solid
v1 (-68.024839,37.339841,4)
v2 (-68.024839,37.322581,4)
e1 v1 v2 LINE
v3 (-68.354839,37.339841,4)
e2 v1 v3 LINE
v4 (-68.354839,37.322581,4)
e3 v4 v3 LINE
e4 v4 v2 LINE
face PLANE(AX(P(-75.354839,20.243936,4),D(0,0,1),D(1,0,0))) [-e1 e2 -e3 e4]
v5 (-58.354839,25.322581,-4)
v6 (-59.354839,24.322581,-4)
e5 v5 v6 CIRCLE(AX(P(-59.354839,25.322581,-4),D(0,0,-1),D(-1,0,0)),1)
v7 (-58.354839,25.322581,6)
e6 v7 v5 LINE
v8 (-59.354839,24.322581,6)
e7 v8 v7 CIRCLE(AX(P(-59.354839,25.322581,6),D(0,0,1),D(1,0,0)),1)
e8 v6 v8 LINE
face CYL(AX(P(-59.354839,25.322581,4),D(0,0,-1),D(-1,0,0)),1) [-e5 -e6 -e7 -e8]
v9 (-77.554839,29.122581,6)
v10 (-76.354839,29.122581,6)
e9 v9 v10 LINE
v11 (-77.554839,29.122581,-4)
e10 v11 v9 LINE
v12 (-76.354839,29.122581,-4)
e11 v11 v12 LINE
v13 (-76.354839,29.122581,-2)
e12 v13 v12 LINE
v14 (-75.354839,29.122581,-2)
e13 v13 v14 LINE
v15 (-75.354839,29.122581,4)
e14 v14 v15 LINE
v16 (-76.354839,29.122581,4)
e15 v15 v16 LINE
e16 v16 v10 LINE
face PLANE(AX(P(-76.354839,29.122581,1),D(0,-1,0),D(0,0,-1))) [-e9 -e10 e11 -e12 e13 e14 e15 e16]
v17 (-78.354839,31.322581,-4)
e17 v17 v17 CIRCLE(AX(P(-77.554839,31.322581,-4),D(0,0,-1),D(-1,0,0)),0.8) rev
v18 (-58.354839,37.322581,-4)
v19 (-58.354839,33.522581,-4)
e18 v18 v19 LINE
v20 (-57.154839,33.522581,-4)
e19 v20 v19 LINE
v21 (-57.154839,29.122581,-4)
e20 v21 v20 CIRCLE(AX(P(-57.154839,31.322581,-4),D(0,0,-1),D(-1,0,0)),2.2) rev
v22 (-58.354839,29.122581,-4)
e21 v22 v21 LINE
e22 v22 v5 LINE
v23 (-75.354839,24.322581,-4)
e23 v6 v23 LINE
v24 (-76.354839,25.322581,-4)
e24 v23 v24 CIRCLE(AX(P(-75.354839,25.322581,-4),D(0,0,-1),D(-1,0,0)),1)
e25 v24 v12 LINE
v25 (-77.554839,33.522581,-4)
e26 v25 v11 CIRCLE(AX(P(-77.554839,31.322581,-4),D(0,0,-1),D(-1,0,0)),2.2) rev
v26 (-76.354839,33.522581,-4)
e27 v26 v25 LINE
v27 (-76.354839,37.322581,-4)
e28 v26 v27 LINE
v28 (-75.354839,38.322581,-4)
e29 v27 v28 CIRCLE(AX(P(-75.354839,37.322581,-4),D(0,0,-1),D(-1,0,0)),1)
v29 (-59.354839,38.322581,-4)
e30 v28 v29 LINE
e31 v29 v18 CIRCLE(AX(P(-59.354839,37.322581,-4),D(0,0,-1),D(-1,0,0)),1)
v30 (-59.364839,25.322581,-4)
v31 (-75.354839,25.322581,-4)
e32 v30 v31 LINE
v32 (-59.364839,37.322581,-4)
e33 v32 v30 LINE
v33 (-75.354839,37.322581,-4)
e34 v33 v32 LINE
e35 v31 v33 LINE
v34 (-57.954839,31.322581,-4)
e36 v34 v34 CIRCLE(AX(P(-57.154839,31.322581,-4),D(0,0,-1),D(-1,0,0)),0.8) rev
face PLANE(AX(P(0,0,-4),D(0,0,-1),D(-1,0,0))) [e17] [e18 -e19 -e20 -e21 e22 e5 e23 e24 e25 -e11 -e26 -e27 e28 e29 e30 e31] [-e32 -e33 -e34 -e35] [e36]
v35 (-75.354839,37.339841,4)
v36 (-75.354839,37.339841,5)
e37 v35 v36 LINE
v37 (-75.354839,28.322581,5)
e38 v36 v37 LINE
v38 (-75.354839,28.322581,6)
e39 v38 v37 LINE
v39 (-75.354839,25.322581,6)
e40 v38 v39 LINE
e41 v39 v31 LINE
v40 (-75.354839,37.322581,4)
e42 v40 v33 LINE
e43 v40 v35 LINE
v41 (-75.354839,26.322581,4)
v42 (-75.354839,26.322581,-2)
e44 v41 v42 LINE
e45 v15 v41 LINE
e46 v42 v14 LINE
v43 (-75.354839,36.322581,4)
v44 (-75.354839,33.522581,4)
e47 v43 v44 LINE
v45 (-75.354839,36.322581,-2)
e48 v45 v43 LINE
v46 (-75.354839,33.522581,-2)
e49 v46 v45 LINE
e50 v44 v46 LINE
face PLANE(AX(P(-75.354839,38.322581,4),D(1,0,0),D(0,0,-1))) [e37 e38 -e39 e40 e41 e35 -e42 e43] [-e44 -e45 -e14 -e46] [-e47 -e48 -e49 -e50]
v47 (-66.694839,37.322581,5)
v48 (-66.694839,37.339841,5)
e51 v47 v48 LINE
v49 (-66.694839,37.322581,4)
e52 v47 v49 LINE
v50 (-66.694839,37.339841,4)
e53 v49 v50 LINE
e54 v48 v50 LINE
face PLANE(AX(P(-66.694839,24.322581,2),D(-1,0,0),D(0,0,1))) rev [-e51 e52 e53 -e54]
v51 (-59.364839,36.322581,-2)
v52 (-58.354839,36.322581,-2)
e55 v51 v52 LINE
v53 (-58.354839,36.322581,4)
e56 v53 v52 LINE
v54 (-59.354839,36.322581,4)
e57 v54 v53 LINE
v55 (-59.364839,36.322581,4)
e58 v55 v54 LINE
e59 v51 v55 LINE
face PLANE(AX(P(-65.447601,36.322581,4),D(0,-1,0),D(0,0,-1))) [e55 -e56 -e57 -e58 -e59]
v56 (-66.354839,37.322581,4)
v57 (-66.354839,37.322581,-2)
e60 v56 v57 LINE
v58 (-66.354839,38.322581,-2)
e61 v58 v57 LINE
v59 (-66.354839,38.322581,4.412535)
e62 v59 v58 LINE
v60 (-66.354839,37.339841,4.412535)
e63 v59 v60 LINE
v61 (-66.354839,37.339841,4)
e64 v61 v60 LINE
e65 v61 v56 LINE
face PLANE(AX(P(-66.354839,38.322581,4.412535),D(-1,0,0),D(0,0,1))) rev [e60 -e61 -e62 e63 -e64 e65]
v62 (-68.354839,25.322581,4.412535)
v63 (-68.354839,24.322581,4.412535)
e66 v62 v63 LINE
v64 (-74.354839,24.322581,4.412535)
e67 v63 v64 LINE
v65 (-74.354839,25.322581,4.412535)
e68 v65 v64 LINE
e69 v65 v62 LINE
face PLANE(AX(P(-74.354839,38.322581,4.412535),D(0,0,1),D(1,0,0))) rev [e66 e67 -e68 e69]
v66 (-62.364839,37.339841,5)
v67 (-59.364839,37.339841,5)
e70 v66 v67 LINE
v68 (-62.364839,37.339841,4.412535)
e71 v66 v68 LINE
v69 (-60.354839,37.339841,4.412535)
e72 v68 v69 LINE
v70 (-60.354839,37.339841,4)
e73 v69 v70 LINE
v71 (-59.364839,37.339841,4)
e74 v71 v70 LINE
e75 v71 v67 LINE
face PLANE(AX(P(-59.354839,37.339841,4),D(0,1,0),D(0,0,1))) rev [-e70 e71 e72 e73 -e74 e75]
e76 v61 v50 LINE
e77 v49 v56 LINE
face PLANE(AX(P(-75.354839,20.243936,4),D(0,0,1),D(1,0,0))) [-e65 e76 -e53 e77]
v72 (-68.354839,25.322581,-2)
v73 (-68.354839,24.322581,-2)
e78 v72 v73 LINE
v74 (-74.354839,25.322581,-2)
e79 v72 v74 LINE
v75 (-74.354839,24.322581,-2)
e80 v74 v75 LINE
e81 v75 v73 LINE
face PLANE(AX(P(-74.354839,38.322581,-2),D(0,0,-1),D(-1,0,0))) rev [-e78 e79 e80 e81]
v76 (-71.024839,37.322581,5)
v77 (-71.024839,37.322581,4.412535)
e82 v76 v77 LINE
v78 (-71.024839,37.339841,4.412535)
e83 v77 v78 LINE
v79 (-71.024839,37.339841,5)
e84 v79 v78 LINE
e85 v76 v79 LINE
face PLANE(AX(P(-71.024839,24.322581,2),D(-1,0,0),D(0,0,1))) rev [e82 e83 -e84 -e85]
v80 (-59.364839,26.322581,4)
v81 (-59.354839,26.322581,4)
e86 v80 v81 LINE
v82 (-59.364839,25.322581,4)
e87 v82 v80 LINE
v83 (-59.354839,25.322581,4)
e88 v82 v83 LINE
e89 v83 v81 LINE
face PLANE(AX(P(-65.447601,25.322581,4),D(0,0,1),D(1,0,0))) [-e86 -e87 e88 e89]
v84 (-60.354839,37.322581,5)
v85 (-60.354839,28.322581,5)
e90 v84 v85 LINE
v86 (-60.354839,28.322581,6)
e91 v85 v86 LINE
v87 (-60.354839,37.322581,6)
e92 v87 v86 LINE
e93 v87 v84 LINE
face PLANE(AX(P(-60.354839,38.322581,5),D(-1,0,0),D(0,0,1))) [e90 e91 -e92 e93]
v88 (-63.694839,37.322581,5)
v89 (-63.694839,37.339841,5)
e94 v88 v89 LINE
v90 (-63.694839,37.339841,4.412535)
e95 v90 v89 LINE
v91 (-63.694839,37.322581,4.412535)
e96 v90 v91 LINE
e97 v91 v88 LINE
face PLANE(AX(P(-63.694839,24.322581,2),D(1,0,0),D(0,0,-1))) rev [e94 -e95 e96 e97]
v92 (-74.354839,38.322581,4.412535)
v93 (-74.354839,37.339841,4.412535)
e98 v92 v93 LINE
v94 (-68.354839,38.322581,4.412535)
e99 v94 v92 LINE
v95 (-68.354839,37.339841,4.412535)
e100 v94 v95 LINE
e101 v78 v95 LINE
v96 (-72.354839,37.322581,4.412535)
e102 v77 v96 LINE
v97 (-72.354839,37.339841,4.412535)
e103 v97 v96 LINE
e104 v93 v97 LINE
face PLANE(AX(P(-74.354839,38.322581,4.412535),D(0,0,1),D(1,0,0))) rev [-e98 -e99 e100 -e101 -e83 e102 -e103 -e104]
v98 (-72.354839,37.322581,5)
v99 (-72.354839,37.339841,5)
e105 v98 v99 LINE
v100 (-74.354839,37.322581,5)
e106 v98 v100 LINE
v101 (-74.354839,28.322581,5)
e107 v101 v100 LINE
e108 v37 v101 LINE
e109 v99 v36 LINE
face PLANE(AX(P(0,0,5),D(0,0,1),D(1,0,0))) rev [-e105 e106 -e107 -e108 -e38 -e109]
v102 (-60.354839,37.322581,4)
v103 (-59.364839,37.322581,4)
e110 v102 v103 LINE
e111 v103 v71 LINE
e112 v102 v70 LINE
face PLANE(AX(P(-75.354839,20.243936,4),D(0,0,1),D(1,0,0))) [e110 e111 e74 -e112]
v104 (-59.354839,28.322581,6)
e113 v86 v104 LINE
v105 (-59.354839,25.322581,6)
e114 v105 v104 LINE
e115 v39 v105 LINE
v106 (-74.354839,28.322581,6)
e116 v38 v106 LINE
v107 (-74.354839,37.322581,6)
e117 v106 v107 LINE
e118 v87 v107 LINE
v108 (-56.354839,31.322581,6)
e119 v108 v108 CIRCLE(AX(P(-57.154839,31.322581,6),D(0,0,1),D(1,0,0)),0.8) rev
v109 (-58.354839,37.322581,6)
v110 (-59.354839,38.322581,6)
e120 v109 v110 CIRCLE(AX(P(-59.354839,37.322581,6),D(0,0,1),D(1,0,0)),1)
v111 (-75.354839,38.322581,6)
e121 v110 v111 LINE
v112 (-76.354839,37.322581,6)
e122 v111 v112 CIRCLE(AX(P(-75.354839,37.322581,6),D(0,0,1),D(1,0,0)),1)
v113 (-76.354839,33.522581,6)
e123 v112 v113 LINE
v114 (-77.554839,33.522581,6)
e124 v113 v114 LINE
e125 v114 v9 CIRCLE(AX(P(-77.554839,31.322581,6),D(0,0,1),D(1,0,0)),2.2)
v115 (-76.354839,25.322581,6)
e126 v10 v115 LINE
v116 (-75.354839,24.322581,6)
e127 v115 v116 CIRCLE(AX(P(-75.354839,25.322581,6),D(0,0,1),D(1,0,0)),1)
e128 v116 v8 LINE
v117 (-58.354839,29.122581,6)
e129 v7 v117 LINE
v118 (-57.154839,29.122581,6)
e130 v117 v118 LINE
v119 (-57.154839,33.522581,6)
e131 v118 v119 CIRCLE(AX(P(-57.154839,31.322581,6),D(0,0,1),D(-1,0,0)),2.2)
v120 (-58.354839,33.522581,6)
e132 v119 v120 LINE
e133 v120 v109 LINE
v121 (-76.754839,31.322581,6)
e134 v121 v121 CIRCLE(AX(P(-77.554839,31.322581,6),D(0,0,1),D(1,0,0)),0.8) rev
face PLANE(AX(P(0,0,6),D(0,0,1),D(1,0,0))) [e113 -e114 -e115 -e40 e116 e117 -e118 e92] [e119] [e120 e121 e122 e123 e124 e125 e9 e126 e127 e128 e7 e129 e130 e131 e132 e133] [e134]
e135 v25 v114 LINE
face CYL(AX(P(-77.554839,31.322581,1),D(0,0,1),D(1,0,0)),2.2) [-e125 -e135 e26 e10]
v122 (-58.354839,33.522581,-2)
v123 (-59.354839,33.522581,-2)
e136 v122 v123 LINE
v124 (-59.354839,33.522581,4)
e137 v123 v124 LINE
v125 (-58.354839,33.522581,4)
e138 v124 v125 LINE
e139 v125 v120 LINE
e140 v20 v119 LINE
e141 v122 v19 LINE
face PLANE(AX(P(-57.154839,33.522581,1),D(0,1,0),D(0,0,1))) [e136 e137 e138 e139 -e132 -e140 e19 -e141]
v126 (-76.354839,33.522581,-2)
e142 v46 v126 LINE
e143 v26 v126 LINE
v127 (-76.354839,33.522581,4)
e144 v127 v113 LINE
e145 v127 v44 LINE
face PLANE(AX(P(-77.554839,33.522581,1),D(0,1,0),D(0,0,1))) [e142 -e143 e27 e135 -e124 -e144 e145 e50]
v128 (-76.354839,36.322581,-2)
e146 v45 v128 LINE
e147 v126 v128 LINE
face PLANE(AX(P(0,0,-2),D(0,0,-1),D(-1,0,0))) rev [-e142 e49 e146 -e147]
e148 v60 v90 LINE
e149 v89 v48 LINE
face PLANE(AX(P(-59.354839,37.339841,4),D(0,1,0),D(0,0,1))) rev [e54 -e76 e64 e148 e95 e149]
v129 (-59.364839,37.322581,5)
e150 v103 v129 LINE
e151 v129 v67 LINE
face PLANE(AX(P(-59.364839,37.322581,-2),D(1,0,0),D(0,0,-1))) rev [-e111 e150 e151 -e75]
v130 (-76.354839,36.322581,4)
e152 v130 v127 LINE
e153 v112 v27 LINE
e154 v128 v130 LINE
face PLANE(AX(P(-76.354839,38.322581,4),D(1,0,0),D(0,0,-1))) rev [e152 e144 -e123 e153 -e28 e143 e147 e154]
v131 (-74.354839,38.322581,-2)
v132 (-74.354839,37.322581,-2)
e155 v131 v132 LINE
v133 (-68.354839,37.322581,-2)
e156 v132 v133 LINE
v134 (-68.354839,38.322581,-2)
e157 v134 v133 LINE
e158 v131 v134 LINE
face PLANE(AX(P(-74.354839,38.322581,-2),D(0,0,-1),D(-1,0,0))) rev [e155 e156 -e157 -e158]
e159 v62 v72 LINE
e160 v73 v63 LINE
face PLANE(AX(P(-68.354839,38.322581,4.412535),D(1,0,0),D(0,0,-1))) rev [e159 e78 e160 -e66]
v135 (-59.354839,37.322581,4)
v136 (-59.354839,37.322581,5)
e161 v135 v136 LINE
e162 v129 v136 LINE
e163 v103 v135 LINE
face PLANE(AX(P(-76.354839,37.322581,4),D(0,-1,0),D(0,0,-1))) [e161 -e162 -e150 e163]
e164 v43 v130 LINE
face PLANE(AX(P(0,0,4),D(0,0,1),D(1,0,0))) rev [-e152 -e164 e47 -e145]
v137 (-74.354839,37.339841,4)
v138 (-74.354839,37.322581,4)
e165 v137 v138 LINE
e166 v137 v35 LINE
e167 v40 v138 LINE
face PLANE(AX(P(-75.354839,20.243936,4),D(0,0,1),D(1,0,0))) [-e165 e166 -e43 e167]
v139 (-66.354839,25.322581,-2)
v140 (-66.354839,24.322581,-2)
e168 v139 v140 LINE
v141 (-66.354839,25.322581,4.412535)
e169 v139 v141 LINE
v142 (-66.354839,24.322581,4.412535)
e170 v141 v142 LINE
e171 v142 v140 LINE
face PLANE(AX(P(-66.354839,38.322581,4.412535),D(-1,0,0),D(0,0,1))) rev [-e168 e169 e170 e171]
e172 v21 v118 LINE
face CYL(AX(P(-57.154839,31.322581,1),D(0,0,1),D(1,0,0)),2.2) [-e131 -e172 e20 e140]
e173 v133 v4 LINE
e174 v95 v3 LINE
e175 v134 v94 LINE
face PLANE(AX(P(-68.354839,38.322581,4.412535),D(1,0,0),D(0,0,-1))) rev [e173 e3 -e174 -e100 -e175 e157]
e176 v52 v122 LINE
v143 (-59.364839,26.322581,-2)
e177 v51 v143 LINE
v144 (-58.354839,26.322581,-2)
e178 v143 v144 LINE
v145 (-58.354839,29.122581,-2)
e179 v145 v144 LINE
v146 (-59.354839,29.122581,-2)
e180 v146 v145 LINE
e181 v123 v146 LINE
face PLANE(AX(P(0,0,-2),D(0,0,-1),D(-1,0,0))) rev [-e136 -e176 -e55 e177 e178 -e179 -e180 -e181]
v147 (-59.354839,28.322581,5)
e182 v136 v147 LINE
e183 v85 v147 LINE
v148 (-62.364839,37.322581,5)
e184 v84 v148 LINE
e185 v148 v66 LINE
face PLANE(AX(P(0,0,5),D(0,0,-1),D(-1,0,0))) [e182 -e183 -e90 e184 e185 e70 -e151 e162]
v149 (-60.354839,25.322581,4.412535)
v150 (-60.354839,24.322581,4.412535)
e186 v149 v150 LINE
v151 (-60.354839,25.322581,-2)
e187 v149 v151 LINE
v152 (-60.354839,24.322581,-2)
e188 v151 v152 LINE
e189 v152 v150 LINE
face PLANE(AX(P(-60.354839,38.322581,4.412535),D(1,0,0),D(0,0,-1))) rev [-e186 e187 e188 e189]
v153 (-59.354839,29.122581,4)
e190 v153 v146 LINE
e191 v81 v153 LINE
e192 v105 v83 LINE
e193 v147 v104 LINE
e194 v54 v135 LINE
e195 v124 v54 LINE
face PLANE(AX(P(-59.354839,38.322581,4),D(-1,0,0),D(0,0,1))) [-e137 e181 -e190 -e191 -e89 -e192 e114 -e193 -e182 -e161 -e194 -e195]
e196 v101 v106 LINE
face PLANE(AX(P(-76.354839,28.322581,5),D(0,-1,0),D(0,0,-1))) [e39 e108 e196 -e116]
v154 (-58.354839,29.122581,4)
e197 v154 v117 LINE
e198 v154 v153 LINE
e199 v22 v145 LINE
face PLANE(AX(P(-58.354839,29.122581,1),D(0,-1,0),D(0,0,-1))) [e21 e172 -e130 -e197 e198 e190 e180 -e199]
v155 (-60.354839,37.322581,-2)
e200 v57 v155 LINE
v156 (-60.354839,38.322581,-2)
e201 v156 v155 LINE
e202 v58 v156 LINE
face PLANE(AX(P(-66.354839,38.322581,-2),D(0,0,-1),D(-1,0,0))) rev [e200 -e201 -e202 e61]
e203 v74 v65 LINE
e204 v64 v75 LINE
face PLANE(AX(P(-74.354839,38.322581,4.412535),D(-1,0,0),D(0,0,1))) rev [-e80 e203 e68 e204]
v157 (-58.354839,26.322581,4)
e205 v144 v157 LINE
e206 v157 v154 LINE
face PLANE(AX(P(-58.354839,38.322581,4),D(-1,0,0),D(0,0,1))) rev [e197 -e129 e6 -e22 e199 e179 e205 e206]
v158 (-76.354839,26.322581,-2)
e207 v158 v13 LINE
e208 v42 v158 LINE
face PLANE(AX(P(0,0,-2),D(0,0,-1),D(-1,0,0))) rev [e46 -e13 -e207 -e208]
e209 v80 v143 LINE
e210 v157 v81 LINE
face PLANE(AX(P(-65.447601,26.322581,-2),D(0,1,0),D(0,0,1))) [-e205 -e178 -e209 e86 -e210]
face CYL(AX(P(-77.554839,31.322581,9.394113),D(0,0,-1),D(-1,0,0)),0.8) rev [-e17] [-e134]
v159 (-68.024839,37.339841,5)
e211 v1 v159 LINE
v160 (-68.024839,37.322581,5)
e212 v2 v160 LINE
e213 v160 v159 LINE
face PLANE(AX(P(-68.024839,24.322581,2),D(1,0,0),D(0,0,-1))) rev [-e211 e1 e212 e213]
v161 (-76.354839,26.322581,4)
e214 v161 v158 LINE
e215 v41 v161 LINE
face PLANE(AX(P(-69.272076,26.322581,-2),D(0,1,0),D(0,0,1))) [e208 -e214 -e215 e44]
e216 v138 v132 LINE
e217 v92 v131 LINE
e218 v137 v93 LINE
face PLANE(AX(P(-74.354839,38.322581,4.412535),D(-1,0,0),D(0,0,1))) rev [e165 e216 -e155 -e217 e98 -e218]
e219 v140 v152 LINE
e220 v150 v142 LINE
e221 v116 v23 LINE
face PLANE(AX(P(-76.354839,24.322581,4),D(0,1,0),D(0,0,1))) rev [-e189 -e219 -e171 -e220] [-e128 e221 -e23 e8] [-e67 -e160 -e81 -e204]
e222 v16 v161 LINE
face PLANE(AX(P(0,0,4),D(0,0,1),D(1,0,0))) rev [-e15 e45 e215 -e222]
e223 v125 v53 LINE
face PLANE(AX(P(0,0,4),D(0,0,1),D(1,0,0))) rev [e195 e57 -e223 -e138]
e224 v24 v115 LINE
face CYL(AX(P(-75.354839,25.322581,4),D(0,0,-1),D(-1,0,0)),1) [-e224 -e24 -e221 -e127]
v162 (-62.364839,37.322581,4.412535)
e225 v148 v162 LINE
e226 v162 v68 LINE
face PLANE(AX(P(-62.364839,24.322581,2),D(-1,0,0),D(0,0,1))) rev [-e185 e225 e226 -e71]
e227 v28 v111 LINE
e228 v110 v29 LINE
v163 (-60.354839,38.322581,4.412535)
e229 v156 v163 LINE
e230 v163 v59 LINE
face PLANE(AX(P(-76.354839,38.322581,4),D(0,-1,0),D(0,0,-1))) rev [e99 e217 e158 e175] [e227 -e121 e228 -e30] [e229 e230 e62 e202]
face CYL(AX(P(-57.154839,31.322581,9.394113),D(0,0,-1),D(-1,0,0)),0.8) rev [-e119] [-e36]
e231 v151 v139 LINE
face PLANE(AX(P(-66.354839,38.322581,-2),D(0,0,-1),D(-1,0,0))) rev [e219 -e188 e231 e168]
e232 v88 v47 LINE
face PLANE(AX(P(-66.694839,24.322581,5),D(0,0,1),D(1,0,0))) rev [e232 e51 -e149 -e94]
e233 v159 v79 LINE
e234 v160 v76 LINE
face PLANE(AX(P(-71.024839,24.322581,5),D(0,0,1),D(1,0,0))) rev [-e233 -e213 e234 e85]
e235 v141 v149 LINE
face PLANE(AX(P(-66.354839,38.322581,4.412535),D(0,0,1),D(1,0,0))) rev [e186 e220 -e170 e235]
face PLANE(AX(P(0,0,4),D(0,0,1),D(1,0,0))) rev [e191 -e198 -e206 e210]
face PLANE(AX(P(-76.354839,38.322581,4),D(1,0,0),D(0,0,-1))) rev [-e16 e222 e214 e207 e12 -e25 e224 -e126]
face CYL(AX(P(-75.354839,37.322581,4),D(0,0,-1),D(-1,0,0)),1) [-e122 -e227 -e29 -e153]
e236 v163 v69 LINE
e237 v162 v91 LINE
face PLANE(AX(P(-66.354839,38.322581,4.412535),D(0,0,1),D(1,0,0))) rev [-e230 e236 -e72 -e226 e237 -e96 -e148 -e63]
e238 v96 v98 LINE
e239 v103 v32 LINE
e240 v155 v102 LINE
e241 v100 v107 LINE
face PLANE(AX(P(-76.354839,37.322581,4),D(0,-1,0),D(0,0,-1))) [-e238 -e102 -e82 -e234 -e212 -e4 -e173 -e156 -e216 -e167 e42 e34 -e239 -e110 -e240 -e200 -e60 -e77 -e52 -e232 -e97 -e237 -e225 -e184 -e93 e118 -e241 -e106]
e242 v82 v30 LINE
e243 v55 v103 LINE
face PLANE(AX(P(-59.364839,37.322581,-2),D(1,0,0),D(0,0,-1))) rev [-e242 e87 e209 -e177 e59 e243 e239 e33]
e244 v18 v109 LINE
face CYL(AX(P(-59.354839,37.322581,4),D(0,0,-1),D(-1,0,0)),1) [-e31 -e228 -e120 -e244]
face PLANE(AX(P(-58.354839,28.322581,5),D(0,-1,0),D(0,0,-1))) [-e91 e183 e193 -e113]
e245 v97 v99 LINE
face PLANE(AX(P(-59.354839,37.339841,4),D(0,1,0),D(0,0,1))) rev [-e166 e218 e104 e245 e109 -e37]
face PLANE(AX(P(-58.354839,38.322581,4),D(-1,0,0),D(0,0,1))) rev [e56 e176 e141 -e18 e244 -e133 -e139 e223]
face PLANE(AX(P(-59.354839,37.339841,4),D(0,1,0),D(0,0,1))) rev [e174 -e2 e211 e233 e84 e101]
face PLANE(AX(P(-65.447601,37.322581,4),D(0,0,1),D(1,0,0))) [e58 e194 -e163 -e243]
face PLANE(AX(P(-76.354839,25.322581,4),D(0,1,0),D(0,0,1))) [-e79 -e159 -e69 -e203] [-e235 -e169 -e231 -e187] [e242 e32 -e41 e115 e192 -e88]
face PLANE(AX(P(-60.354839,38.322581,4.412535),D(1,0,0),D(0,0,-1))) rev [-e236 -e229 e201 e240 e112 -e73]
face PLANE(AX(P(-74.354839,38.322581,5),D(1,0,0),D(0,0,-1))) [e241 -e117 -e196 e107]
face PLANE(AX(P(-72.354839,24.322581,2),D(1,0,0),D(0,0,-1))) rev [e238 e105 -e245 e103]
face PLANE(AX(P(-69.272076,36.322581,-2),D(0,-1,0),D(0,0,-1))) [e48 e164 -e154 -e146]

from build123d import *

# Parameters (mm, degrees)
SKETCH_2_W           = 18
SKETCH_2_H           = 14
EXTRUDE_1_DEPTH      = 4
SHELL_1_T            = -1
SKETCH_3_W           = 2.5
SKETCH_3_H           = 2
CUT_EXTRUDE_1_DEPTH  = 4
SKETCH_4_W           = 1.5
SKETCH_4_H           = 6
EXTRUDE_2_DEPTH      = 5
SKETCH_5_W           = 1.5
SKETCH_5_H           = 6
EXTRUDE_3_DEPTH      = 5
SKETCH_6_R           = 1.1
CUT_EXTRUDE_2_DEPTH  = 5
FILLET_1_R           = 3
SKETCH_7_W           = 5.917960412
SKETCH_7_H           = 8.297832083
CUT_EXTRUDE_3_DEPTH  = 10
SKETCH_8_R           = 0.7
EXTRUDE_5_DEPTH      = 3
SKETCH_9_W           = 5.283067479
SKETCH_9_H           = 7.875128382
CUT_EXTRUDE_6_DEPTH  = 3
SKETCH_10_R          = 0.7
EXTRUDE_6_DEPTH      = 3
SKETCH_11_R          = 0.7
EXTRUDE_7_DEPTH      = 1
FILLET_6_R           = 1
SKETCH_12_W          = 30.892671625
SKETCH_12_H          = 21.919086058
CUT_EXTRUDE_7_DEPTH  = 1
SKETCH_13_W          = 18
SKETCH_13_H          = 14
SKETCH_13_W_2        = 16
SKETCH_13_H_2        = 12
EXTRUDE_8_DEPTH      = 2
EXTRUDE_START        = 2
SKETCH_14_R          = 0.7
EXTRUDE_9_DEPTH      = 2
SKETCH_15_W          = 2
SKETCH_15_H          = 10
EXTRUDE_11_DEPTH     = 1
SKETCH_16_W          = 3
SKETCH_16_H          = 3
CUT_EXTRUDE_9_DEPTH  = 82.19627022
SKETCH_17_R          = 1.2
CUT_EXTRUDE_10_DEPTH = 89.625360281
SKETCH_18_W          = 18
SKETCH_18_H          = 14
SKETCH_18_W_2        = 16
SKETCH_18_H_2        = 12
EXTRUDE_12_DEPTH     = 10
SKETCH_19_R          = 1.2
SKETCH_19_R_2        = 0.8
EXTRUDE_14_DEPTH     = 5
SKETCH_20_R          = 0.8
EXTRUDE_15_DEPTH     = 10
SKETCH_21_W          = 2.939386231
SKETCH_21_H          = 10
SKETCH_21_W_2        = 3
SKETCH_21_W_3        = 3.044568854
CUT_EXTRUDE_11_DEPTH = 82.472905297
SKETCH_22_W          = 13
SKETCH_22_H          = 3.8
CUT_EXTRUDE_12_DEPTH = 45.806028471
SKETCH_23_W          = 27.889217439
SKETCH_23_H          = 16.978710397
CUT_EXTRUDE_13_DEPTH = 5
SKETCH_24_W          = 18
SKETCH_24_H          = 14
SKETCH_24_W_2        = 15.99
SKETCH_24_H_2        = 12
EXTRUDE_16_DEPTH     = 2
SKETCH_25_W          = 18
SKETCH_25_H          = 14
SKETCH_25_W_2        = 16
SKETCH_25_H_2        = 12.017260671
EXTRUDE_17_DEPTH     = 2
SKETCH_26_W          = 6
SKETCH_26_H          = 1
EXTRUDE_18_DEPTH     = 1
SKETCH_27_W          = 6
SKETCH_27_H          = 1
EXTRUDE_19_DEPTH     = 1.01
SKETCH_28_W          = 15.99
SKETCH_28_H          = 6
EXTRUDE_20_DEPTH     = 1
EXTRUDE_START_2      = -1
SKETCH_29_W          = 15.99
SKETCH_29_H          = 6
EXTRUDE_21_DEPTH     = 1
SKETCH_30_W          = 6
SKETCH_30_H          = 6.412534926
CUT_EXTRUDE_14_DEPTH = 82.19627022
FILLET_7_R           = 1


# Some blends are built 0.0001 mm under size
with BuildPart() as part:
    # Эскиз2 → Бобышка-Вытянуть1 (new body)
    with BuildSketch(Plane.XY):
        with Locations((-67.35483871, 31.322580645)):
            Rectangle(SKETCH_2_W, SKETCH_2_H)
    extrude(amount=EXTRUDE_1_DEPTH)

    # Оболочка1
    shell_1_openings = [part.faces().sort_by_distance(p)[0] for p in [
        (-67.35483871, 31.322580645, 4),
    ]]
    offset(amount=SHELL_1_T, openings=shell_1_openings, kind=Kind.INTERSECTION)

    # Эскиз3 → Вырез-Вытянуть1 (cut)
    with BuildSketch(Plane.XY.offset(1)):
        with Locations((-69.60483871, 36.322580645)):
            Rectangle(SKETCH_3_W, SKETCH_3_H)
        with Locations((-74.10483871, 36.322580645)):
            Rectangle(SKETCH_3_W, SKETCH_3_H)
        with Locations((-65.10483871, 36.322580645)):
            Rectangle(SKETCH_3_W, SKETCH_3_H)
        with Locations((-60.60483871, 36.322580645)):
            Rectangle(SKETCH_3_W, SKETCH_3_H)
        with Locations((-69.60483871, 32.992580645)):
            Rectangle(SKETCH_3_W, SKETCH_3_H)
        with Locations((-65.10483871, 32.992580645)):
            Rectangle(SKETCH_3_W, SKETCH_3_H)
        with Locations((-60.60483871, 32.992580645)):
            Rectangle(SKETCH_3_W, SKETCH_3_H)
        with Locations((-69.60483871, 29.662580645)):
            Rectangle(SKETCH_3_W, SKETCH_3_H)
        with Locations((-65.10483871, 29.662580645)):
            Rectangle(SKETCH_3_W, SKETCH_3_H)
        with Locations((-60.60483871, 29.662580645)):
            Rectangle(SKETCH_3_W, SKETCH_3_H)
        with Locations((-69.60483871, 26.332580645)):
            Rectangle(SKETCH_3_W, SKETCH_3_H)
        with Locations((-65.10483871, 26.332580645)):
            Rectangle(SKETCH_3_W, SKETCH_3_H)
        with Locations((-60.60483871, 26.332580645)):
            Rectangle(SKETCH_3_W, SKETCH_3_H)
        with Locations((-74.10483871, 32.992580645)):
            Rectangle(SKETCH_3_W, SKETCH_3_H)
        with Locations((-74.10483871, 29.662580645)):
            Rectangle(SKETCH_3_W, SKETCH_3_H)
        with Locations((-74.10483871, 26.332580645)):
            Rectangle(SKETCH_3_W, SKETCH_3_H)
    extrude(amount=-CUT_EXTRUDE_1_DEPTH, mode=Mode.SUBTRACT)

    # Эскиз4 → Бобышка-Вытянуть2 (add)
    with BuildSketch(Plane.ZY.offset(76.35483871)):
        with Locations((3.25, 31.322580645)):
            Rectangle(SKETCH_4_W, SKETCH_4_H)
    extrude(amount=EXTRUDE_2_DEPTH)

    # Эскиз5 → Бобышка-Вытянуть3 (add)
    with BuildSketch(Plane(origin=(-58.35483871, 0, 0), x_dir=(0, 0, -1), z_dir=(1, 0, 0))):
        with Locations((-3.25, 31.322580645)):
            Rectangle(SKETCH_5_W, SKETCH_5_H)
    extrude(amount=EXTRUDE_3_DEPTH)

    # Эскиз6 → Вырез-Вытянуть2 (cut)
    with BuildSketch(Plane(origin=(0, 0, 2.5), x_dir=(-1, 0, 0), z_dir=(0, 0, -1))):
        with Locations(Location((55.85483871, 31.322580645, 0), (0, 0, 90))):
            Circle(SKETCH_6_R)
        with Locations(Location((78.85483871, 31.322580645, 0), (0, 0, 90))):
            Circle(SKETCH_6_R)
    extrude(amount=-CUT_EXTRUDE_2_DEPTH, mode=Mode.SUBTRACT)

    # Скругление1
    fillet_1_edges = [part.edges().sort_by_distance(p)[0] for p in [
        (-81.35483871, 28.322580645, 3.25),
        (-81.35483871, 34.322580645, 3.25),
        (-53.35483871, 28.322580645, 3.25),
        (-53.35483871, 34.322580645, 3.25),
    ]]
    fillet(fillet_1_edges, radius=FILLET_1_R - 0.0001)  # a hair under: the kernel refuses the full size

    # Эскиз7 → Вырез-Вытянуть3 (cut)
    with BuildSketch(Plane.XY.offset(4)):
        with Locations((-79.313818916, 31.798685765)):
            Rectangle(SKETCH_7_W, SKETCH_7_H)
    extrude(amount=-CUT_EXTRUDE_3_DEPTH, mode=Mode.SUBTRACT)

    # Эскиз8 → Бобышка-Вытянуть5 (add)
    with BuildSketch(Plane.XY.offset(4)):
        with BuildLine():
            Line((-77.55483871, 33.522580645), (-76.35483871, 33.522580645))
            Line((-76.35483871, 33.522580645), (-76.35483871, 29.122580645))
            Line((-76.35483871, 29.122580645), (-77.55483871, 29.122580645))
            ThreePointArc((-77.55483871, 29.122580645), (-79.75483871, 31.322580645), (-77.55483871, 33.522580645))
        make_face()
        with Locations((-77.55483871, 31.322580645)):
            Circle(SKETCH_8_R, mode=Mode.SUBTRACT)
    extrude(amount=-EXTRUDE_5_DEPTH)

    # Эскиз9 → Вырез-Вытянуть6 (cut)
    with BuildSketch(Plane.XY.offset(4)):
        with Locations((-55.713304971, 31.190086721)):
            Rectangle(SKETCH_9_W, SKETCH_9_H)
    extrude(amount=-CUT_EXTRUDE_6_DEPTH, mode=Mode.SUBTRACT)

    # Эскиз10 → Бобышка-Вытянуть6 (add)
    with BuildSketch(Plane.XY.offset(4)):
        with BuildLine():
            Line((-57.15483871, 33.522580645), (-58.35483871, 33.522580645))
            Line((-58.35483871, 33.522580645), (-58.35483871, 29.122580645))
            Line((-58.35483871, 29.122580645), (-57.15483871, 29.122580645))
            ThreePointArc((-57.15483871, 29.122580645), (-54.95483871, 31.322580645), (-57.15483871, 33.522580645))
        make_face()
        with Locations((-57.15483871, 31.322580645)):
            Circle(SKETCH_10_R, mode=Mode.SUBTRACT)
    extrude(amount=-EXTRUDE_6_DEPTH)

    # Эскиз11 → Бобышка-Вытянуть7 (add)
    # profile 1 of 2: a face of its own
    with BuildSketch(Plane(origin=(0, 0, 1), x_dir=(-1, 0, 0), z_dir=(0, 0, -1))):
        with BuildLine():
            Line((57.15483871, 33.522580645), (58.35483871, 33.522580645))
            Line((58.35483871, 33.522580645), (58.35483871, 29.122580645))
            Line((58.35483871, 29.122580645), (57.15483871, 29.122580645))
            ThreePointArc((57.15483871, 29.122580645), (54.95483871, 31.322580645), (57.15483871, 33.522580645))
        make_face()
        with Locations(Location((57.15483871, 31.322580645, 0), (0, 0, 180))):
            Circle(SKETCH_11_R, mode=Mode.SUBTRACT)
    # profile 2 of 2: a face of its own
    with BuildSketch(Plane(origin=(0, 0, 1), x_dir=(-1, 0, 0), z_dir=(0, 0, -1))):
        with BuildLine():
            Line((77.55483871, 33.522580645), (76.35483871, 33.522580645))
            Line((76.35483871, 33.522580645), (76.35483871, 29.122580645))
            Line((76.35483871, 29.122580645), (77.55483871, 29.122580645))
            ThreePointArc((77.55483871, 29.122580645), (79.75483871, 31.322580645), (77.55483871, 33.522580645))
        make_face()
        with Locations(Location((77.55483871, 31.322580645, 0), (0, 0, 180))):
            Circle(SKETCH_11_R, mode=Mode.SUBTRACT)
    extrude(amount=EXTRUDE_7_DEPTH)

    # Скругление6
    # the kernel refuses this fillet: 1 mm, written as the material it takes off along each edge
    with BuildSketch(Plane(origin=(-76.35483871, 29.122580645, 0), x_dir=(1, 0, 0), z_dir=(0, -1, 0))) as fillet_6_piece_1:
        with BuildLine():
            CenterArc((FILLET_6_R, FILLET_6_R), FILLET_6_R, 180, 90)
            Line((0, FILLET_6_R), (-FILLET_6_R * 0.02, FILLET_6_R))
            Line((-FILLET_6_R * 0.02, FILLET_6_R), (-FILLET_6_R * 0.02, -FILLET_6_R * 0.02))
            Line((-FILLET_6_R * 0.02, -FILLET_6_R * 0.02), (FILLET_6_R, -FILLET_6_R * 0.02))
            Line((FILLET_6_R, -FILLET_6_R * 0.02), (FILLET_6_R, 0))
        make_face()
    extrude(amount=4.8, mode=Mode.SUBTRACT)
    with BuildSketch(Plane(origin=(-77.55483871, 31.322580645, 0), x_dir=(0, -1, 0), z_dir=(1, 0, 0))) as fillet_6_piece_2:
        with BuildLine():
            CenterArc((2.2 - FILLET_6_R, -FILLET_6_R), FILLET_6_R, 0, 90)
            Line((2.2, -FILLET_6_R), (2.2 + FILLET_6_R * 0.02, -FILLET_6_R))
            Line((2.2 + FILLET_6_R * 0.02, -FILLET_6_R), (2.2 + FILLET_6_R * 0.02, FILLET_6_R * 0.02))
            Line((2.2 + FILLET_6_R * 0.02, FILLET_6_R * 0.02), (2.2 - FILLET_6_R, FILLET_6_R * 0.02))
            Line((2.2 - FILLET_6_R, FILLET_6_R * 0.02), (2.2 - FILLET_6_R, 0))
        make_face()
    revolve(axis=Axis((-77.55483871, 31.322580645, 0), (0, 0, -1)), revolution_arc=180, mode=Mode.SUBTRACT)
    with BuildSketch(Plane(origin=(-77.55483871, 33.522580645, 0), x_dir=(0, -1, 0), z_dir=(1, 0, 0)), Plane(origin=(-76.35483871, 29.122580645, 0), x_dir=(0, 1, 0), z_dir=(-1, 0, 0))) as fillet_6_piece_3:
        with BuildLine():
            CenterArc((FILLET_6_R, -FILLET_6_R), FILLET_6_R, 90, 90)
            Line((0, -FILLET_6_R), (-FILLET_6_R * 0.02, -FILLET_6_R))
            Line((-FILLET_6_R * 0.02, -FILLET_6_R), (-FILLET_6_R * 0.02, FILLET_6_R * 0.02))
            Line((-FILLET_6_R * 0.02, FILLET_6_R * 0.02), (FILLET_6_R, FILLET_6_R * 0.02))
            Line((FILLET_6_R, FILLET_6_R * 0.02), (FILLET_6_R, 0))
        make_face()
    extrude(amount=1.2, mode=Mode.SUBTRACT)
    with BuildSketch(Plane(origin=(-58.35483871, 38.322580645, 0), x_dir=(-1, 0, 0), z_dir=(0, -1, 0))) as fillet_6_piece_4:
        with BuildLine():
            CenterArc((FILLET_6_R, -FILLET_6_R), FILLET_6_R, 90, 90)
            Line((0, -FILLET_6_R), (-FILLET_6_R * 0.02, -FILLET_6_R))
            Line((-FILLET_6_R * 0.02, -FILLET_6_R), (-FILLET_6_R * 0.02, FILLET_6_R * 0.02))
            Line((-FILLET_6_R * 0.02, FILLET_6_R * 0.02), (FILLET_6_R, FILLET_6_R * 0.02))
            Line((FILLET_6_R, FILLET_6_R * 0.02), (FILLET_6_R, 0))
        make_face()
    extrude(amount=4.8, mode=Mode.SUBTRACT)
    with BuildSketch(Plane(origin=(-57.15483871, 31.322580645, 0), x_dir=(0, -1, 0), z_dir=(-1, 0, 0))) as fillet_6_piece_5:
        with BuildLine():
            CenterArc((2.2 - FILLET_6_R, FILLET_6_R), FILLET_6_R, 270, 90)
            Line((2.2, FILLET_6_R), (2.2 + FILLET_6_R * 0.02, FILLET_6_R))
            Line((2.2 + FILLET_6_R * 0.02, FILLET_6_R), (2.2 + FILLET_6_R * 0.02, -FILLET_6_R * 0.02))
            Line((2.2 + FILLET_6_R * 0.02, -FILLET_6_R * 0.02), (2.2 - FILLET_6_R, -FILLET_6_R * 0.02))
            Line((2.2 - FILLET_6_R, -FILLET_6_R * 0.02), (2.2 - FILLET_6_R, 0))
        make_face()
    revolve(axis=Axis((-57.15483871, 31.322580645, 0), (0, 0, 1)), revolution_arc=180, mode=Mode.SUBTRACT)
    with BuildSketch(Plane(origin=(-58.35483871, 29.122580645, 0), x_dir=(0, 1, 0), z_dir=(1, 0, 0)), Plane(origin=(-57.15483871, 33.522580645, 0), x_dir=(0, -1, 0), z_dir=(-1, 0, 0))) as fillet_6_piece_6:
        with BuildLine():
            CenterArc((FILLET_6_R, FILLET_6_R), FILLET_6_R, 180, 90)
            Line((0, FILLET_6_R), (-FILLET_6_R * 0.02, FILLET_6_R))
            Line((-FILLET_6_R * 0.02, FILLET_6_R), (-FILLET_6_R * 0.02, -FILLET_6_R * 0.02))
            Line((-FILLET_6_R * 0.02, -FILLET_6_R * 0.02), (FILLET_6_R, -FILLET_6_R * 0.02))
            Line((FILLET_6_R, -FILLET_6_R * 0.02), (FILLET_6_R, 0))
        make_face()
    extrude(amount=1.2, mode=Mode.SUBTRACT)
    with BuildSketch(Plane(origin=(-76.35483871, 31.622580645, 0), x_dir=(1, 0, 0), z_dir=(0, -1, 0))) as fillet_6_piece_7a_section:
        with BuildLine():
            CenterArc((FILLET_6_R, FILLET_6_R), FILLET_6_R, 180, 90)
            Line((0, FILLET_6_R), (-FILLET_6_R * 0.02, FILLET_6_R))
            Line((-FILLET_6_R * 0.02, FILLET_6_R), (-FILLET_6_R * 0.02, -FILLET_6_R * 0.02))
            Line((-FILLET_6_R * 0.02, -FILLET_6_R * 0.02), (FILLET_6_R, -FILLET_6_R * 0.02))
            Line((FILLET_6_R, -FILLET_6_R * 0.02), (FILLET_6_R, 0))
        make_face()
    fillet_6_piece_7a = extrude(amount=7.3, mode=Mode.PRIVATE)
    fillet_6_piece_7a = split(fillet_6_piece_7a, bisect_by=Plane(origin=(-76.128443595, 29.122580645, 0.226395114), z_dir=(0, 1, 0)), keep=Keep.TOP, mode=Mode.PRIVATE)
    with BuildSketch(Plane(origin=(-73.85483871, 29.122580645, 0), x_dir=(0, 1, 0), z_dir=(-1, 0, 0))) as fillet_6_piece_7b_section:
        with BuildLine():
            CenterArc((FILLET_6_R, -FILLET_6_R), FILLET_6_R, 90, 90)
            Line((0, -FILLET_6_R), (-FILLET_6_R * 0.02, -FILLET_6_R))
            Line((-FILLET_6_R * 0.02, -FILLET_6_R), (-FILLET_6_R * 0.02, FILLET_6_R * 0.02))
            Line((-FILLET_6_R * 0.02, FILLET_6_R * 0.02), (FILLET_6_R, FILLET_6_R * 0.02))
            Line((FILLET_6_R, FILLET_6_R * 0.02), (FILLET_6_R, 0))
        make_face()
    fillet_6_piece_7b = extrude(amount=3.7, mode=Mode.PRIVATE)
    fillet_6_piece_7b = split(fillet_6_piece_7b, bisect_by=Plane(origin=(-76.35483871, 29.348975759, 0.226395114), z_dir=(1, 0, 0)), keep=Keep.TOP, mode=Mode.PRIVATE)
    fillet_6_piece_7 = fillet_6_piece_7a & fillet_6_piece_7b
    add(fillet_6_piece_7, mode=Mode.SUBTRACT)
    with BuildSketch(Plane(origin=(-57.15483871, 33.522580645, 0), x_dir=(0, -1, 0), z_dir=(-1, 0, 0))) as fillet_6_piece_8a_section:
        with BuildLine():
            CenterArc((FILLET_6_R, FILLET_6_R), FILLET_6_R, 180, 90)
            Line((0, FILLET_6_R), (-FILLET_6_R * 0.02, FILLET_6_R))
            Line((-FILLET_6_R * 0.02, FILLET_6_R), (-FILLET_6_R * 0.02, -FILLET_6_R * 0.02))
            Line((-FILLET_6_R * 0.02, -FILLET_6_R * 0.02), (FILLET_6_R, -FILLET_6_R * 0.02))
            Line((FILLET_6_R, -FILLET_6_R * 0.02), (FILLET_6_R, 0))
        make_face()
    fillet_6_piece_8a = extrude(amount=3.7, mode=Mode.PRIVATE)
    fillet_6_piece_8a = split(fillet_6_piece_8a, bisect_by=Plane(origin=(-58.35483871, 33.296185531, 0.226395114), z_dir=(-1, 0, 0)), keep=Keep.TOP, mode=Mode.PRIVATE)
    with BuildSketch(Plane(origin=(-58.35483871, 38.322580645, 0), x_dir=(-1, 0, 0), z_dir=(0, -1, 0))) as fillet_6_piece_8b_section:
        with BuildLine():
            CenterArc((FILLET_6_R, -FILLET_6_R), FILLET_6_R, 90, 90)
            Line((0, -FILLET_6_R), (-FILLET_6_R * 0.02, -FILLET_6_R))
            Line((-FILLET_6_R * 0.02, -FILLET_6_R), (-FILLET_6_R * 0.02, FILLET_6_R * 0.02))
            Line((-FILLET_6_R * 0.02, FILLET_6_R * 0.02), (FILLET_6_R, FILLET_6_R * 0.02))
            Line((FILLET_6_R, FILLET_6_R * 0.02), (FILLET_6_R, 0))
        make_face()
    fillet_6_piece_8b = extrude(amount=7.3, mode=Mode.PRIVATE)
    fillet_6_piece_8b = split(fillet_6_piece_8b, bisect_by=Plane(origin=(-58.581233824, 33.522580645, 0.226395114), z_dir=(0, -1, 0)), keep=Keep.TOP, mode=Mode.PRIVATE)
    fillet_6_piece_8 = fillet_6_piece_8a & fillet_6_piece_8b
    add(fillet_6_piece_8, mode=Mode.SUBTRACT)

    # Эскиз12 → Вырез-Вытянуть7 (cut)
    with BuildSketch(Plane(origin=(0, 0, 0), x_dir=(-1, 0, 0), z_dir=(0, 0, -1))):
        with Locations((68.526392305, 30.136365087)):
            Rectangle(SKETCH_12_W, SKETCH_12_H)
    extrude(amount=-CUT_EXTRUDE_7_DEPTH, mode=Mode.SUBTRACT)

    # Эскиз13 → Бобышка-Вытянуть8 (add)
    with BuildSketch(Plane.XY.offset(4)):
        with Locations((-67.35483871, 31.322580645)):
            Rectangle(SKETCH_13_W, SKETCH_13_H)
        with Locations((-67.35483871, 31.322580645)):
            Rectangle(SKETCH_13_W_2, SKETCH_13_H_2, mode=Mode.SUBTRACT)
    extrude(amount=EXTRUDE_8_DEPTH)

    # Эскиз14 → Бобышка-Вытянуть9 (add)
    # profile 1 of 2: a face of its own
    with BuildSketch(Plane.XY.offset(4).offset(EXTRUDE_START)):
        with BuildLine():
            Line((-77.55483871, 33.522580645), (-76.35483871, 33.522580645))
            Line((-76.35483871, 33.522580645), (-76.35483871, 29.122580645))
            Line((-76.35483871, 29.122580645), (-77.55483871, 29.122580645))
            ThreePointArc((-77.55483871, 29.122580645), (-79.75483871, 31.322580645), (-77.55483871, 33.522580645))
        make_face()
        with Locations((-77.55483871, 31.322580645)):
            Circle(SKETCH_14_R, mode=Mode.SUBTRACT)
    # profile 2 of 2: a face of its own
    with BuildSketch(Plane.XY.offset(4).offset(EXTRUDE_START)):
        with BuildLine():
            Line((-57.15483871, 33.522580645), (-58.35483871, 33.522580645))
            Line((-58.35483871, 33.522580645), (-58.35483871, 29.122580645))
            Line((-58.35483871, 29.122580645), (-57.15483871, 29.122580645))
            ThreePointArc((-57.15483871, 29.122580645), (-54.95483871, 31.322580645), (-57.15483871, 33.522580645))
        make_face()
        with Locations((-57.15483871, 31.322580645)):
            Circle(SKETCH_14_R, mode=Mode.SUBTRACT)
    extrude(amount=-EXTRUDE_9_DEPTH)

    # Эскиз15 → Бобышка-Вытянуть11 (add)
    with BuildSketch(Plane.XY.offset(6)):
        with Locations((-59.35483871, 33.322580645)):
            Rectangle(SKETCH_15_W, SKETCH_15_H)
        with Locations((-75.35483871, 33.322580645)):
            Rectangle(SKETCH_15_W, SKETCH_15_H)
    extrude(amount=-EXTRUDE_11_DEPTH)

    # Эскиз16 → Вырез-Вытянуть9 (cut, through all)
    with BuildSketch(Plane(origin=(0, 38.322580645, 0), x_dir=(1, 0, 0), z_dir=(0, 1, 0))):
        with Locations((-73.85483871, -3.5)):
            Rectangle(SKETCH_16_W, SKETCH_16_H)
        with Locations((-69.52483871, -3.5)):
            Rectangle(SKETCH_16_W, SKETCH_16_H)
        with Locations((-65.19483871, -3.5)):
            Rectangle(SKETCH_16_W, SKETCH_16_H)
        with Locations((-60.86483871, -3.5)):
            Rectangle(SKETCH_16_W, SKETCH_16_H)
    extrude(amount=-CUT_EXTRUDE_9_DEPTH, mode=Mode.SUBTRACT)

    # Эскиз17 → Вырез-Вытянуть10 (cut, through all)
    with BuildSketch(Plane(origin=(0, 0, 1), x_dir=(-1, 0, 0), z_dir=(0, 0, -1))):
        with Locations((57.15483871, 31.322580645)):
            Circle(SKETCH_17_R)
        with Locations((77.55483871, 31.322580645)):
            Circle(SKETCH_17_R)
    extrude(amount=-CUT_EXTRUDE_10_DEPTH, mode=Mode.SUBTRACT)

    # Эскиз18 → Бобышка-Вытянуть12 (add)
    with BuildSketch(Plane(origin=(0, 0, 1), x_dir=(-1, 0, 0), z_dir=(0, 0, -1))):
        with Locations((67.35483871, 31.322580645)):
            Rectangle(SKETCH_18_W, SKETCH_18_H)
        with Locations((67.35483871, 31.322580645)):
            Rectangle(SKETCH_18_W_2, SKETCH_18_H_2, mode=Mode.SUBTRACT)
    extrude(amount=EXTRUDE_12_DEPTH)

    # Эскиз19 → Бобышка-Вытянуть14 (add)
    # profile 1 of 2: a face of its own
    with BuildSketch(Plane(origin=(0, 0, 1), x_dir=(-1, 0, 0), z_dir=(0, 0, -1))):
        with Locations((57.15483871, 31.322580645)):
            Circle(SKETCH_19_R)
        with Locations((57.15483871, 31.322580645)):
            Circle(SKETCH_19_R_2, mode=Mode.SUBTRACT)
    # profile 2 of 2: a face of its own
    with BuildSketch(Plane(origin=(0, 0, 1), x_dir=(-1, 0, 0), z_dir=(0, 0, -1))):
        with Locations((77.55483871, 31.322580645)):
            Circle(SKETCH_19_R)
        with Locations((77.55483871, 31.322580645)):
            Circle(SKETCH_19_R_2, mode=Mode.SUBTRACT)
    extrude(amount=-EXTRUDE_14_DEPTH)

    # Эскиз20 → Бобышка-Вытянуть15 (add)
    # profile 1 of 2: a face of its own
    with BuildSketch(Plane(origin=(0, 0, 1), x_dir=(-1, 0, 0), z_dir=(0, 0, -1))):
        with BuildLine():
            Line((77.55483871, 33.522580645), (76.35483871, 33.522580645))
            Line((76.35483871, 33.522580645), (76.35483871, 29.122580645))
            Line((76.35483871, 29.122580645), (77.55483871, 29.122580645))
            ThreePointArc((77.55483871, 29.122580645), (79.75483871, 31.322580645), (77.55483871, 33.522580645))
        make_face()
        with Locations((77.55483871, 31.322580645)):
            Circle(SKETCH_20_R, mode=Mode.SUBTRACT)
    # profile 2 of 2: a face of its own
    with BuildSketch(Plane(origin=(0, 0, 1), x_dir=(-1, 0, 0), z_dir=(0, 0, -1))):
        with BuildLine():
            Line((57.15483871, 33.522580645), (58.35483871, 33.522580645))
            Line((58.35483871, 33.522580645), (58.35483871, 29.122580645))
            Line((58.35483871, 29.122580645), (57.15483871, 29.122580645))
            ThreePointArc((57.15483871, 29.122580645), (54.95483871, 31.322580645), (57.15483871, 33.522580645))
        make_face()
        with Locations((57.15483871, 31.322580645)):
            Circle(SKETCH_20_R, mode=Mode.SUBTRACT)
    extrude(amount=EXTRUDE_15_DEPTH)

    # Эскиз21 → Вырез-Вытянуть11 (cut, through all)
    with BuildSketch(Plane.XZ.offset(-24.322580645)):
        with Locations((-73.885145595, -3)):
            Rectangle(SKETCH_21_W, SKETCH_21_H)
        with Locations((-69.52483871, -3)):
            Rectangle(SKETCH_21_W_2, SKETCH_21_H)
        with Locations((-65.172554283, -3)):
            Rectangle(SKETCH_21_W_3, SKETCH_21_H)
        with Locations((-60.86483871, -3)):
            Rectangle(SKETCH_21_W_2, SKETCH_21_H)
    extrude(amount=-CUT_EXTRUDE_11_DEPTH, mode=Mode.SUBTRACT)

    # Эскиз22 → Вырез-Вытянуть12 (cut, through all)
    with BuildSketch(Plane.ZY.offset(76.35483871)):
        with Locations((-1.5, 27.222580645)):
            Rectangle(SKETCH_22_W, SKETCH_22_H)
        with Locations((-1.5, 35.422580645)):
            Rectangle(SKETCH_22_W, SKETCH_22_H)
    extrude(amount=-CUT_EXTRUDE_12_DEPTH, mode=Mode.SUBTRACT)

    # Эскиз23 → Вырез-Вытянуть13 (cut)
    with BuildSketch(Plane(origin=(0, 0, -9), x_dir=(-1, 0, 0), z_dir=(0, 0, -1))):
        with Locations((67.449459052, 30.98965987)):
            Rectangle(SKETCH_23_W, SKETCH_23_H)
    extrude(amount=-CUT_EXTRUDE_13_DEPTH, mode=Mode.SUBTRACT)

    # Эскиз24 → Бобышка-Вытянуть16 (add)
    with BuildSketch(Plane(origin=(0, 0, -4), x_dir=(-1, 0, 0), z_dir=(0, 0, -1))):
        with Locations((67.35483871, 31.322580645)):
            Rectangle(SKETCH_24_W, SKETCH_24_H)
        with Locations((67.35983871, 31.322580645)):
            Rectangle(SKETCH_24_W_2, SKETCH_24_H_2, mode=Mode.SUBTRACT)
    extrude(amount=-EXTRUDE_16_DEPTH)

    # Эскиз25 → Бобышка-Вытянуть17 (add)
    with BuildSketch(Plane.XY.offset(6)):
        with Locations((-67.35483871, 31.322580645)):
            Rectangle(SKETCH_25_W, SKETCH_25_H)
        with Locations((-67.35483871, 31.331210981)):
            Rectangle(SKETCH_25_W_2, SKETCH_25_H_2, mode=Mode.SUBTRACT)
    extrude(amount=-EXTRUDE_17_DEPTH)

    # Эскиз26 → Бобышка-Вытянуть18 (add)
    with BuildSketch(Plane.ZY.offset(76.35483871)):
        with Locations((1, 36.822580645)):
            Rectangle(SKETCH_26_W, SKETCH_26_H)
        with Locations((1, 25.822580645)):
            Rectangle(SKETCH_26_W, SKETCH_26_H)
    extrude(amount=-EXTRUDE_18_DEPTH)

    # Эскиз27 → Бобышка-Вытянуть19 (add)
    with BuildSketch(Plane(origin=(-58.35483871, 0, 0), x_dir=(0, 0, -1), z_dir=(1, 0, 0))):
        with Locations((-1, 36.822580645)):
            Rectangle(SKETCH_27_W, SKETCH_27_H)
        with Locations((-1, 25.822580645)):
            Rectangle(SKETCH_27_W, SKETCH_27_H)
    extrude(amount=-EXTRUDE_19_DEPTH)

    # Эскиз28 → Бобышка-Вытянуть20 (add)
    with BuildSketch(Plane(origin=(0, 38.322580645, 0), x_dir=(1, 0, 0), z_dir=(0, 1, 0))):
        with Locations((-67.35983871, -1)):
            Rectangle(SKETCH_28_W, SKETCH_28_H)
    extrude(amount=-EXTRUDE_20_DEPTH)

    # Эскиз29 → Бобышка-Вытянуть21 (add)
    with BuildSketch(Plane.XZ.offset(-24.322580645).offset(EXTRUDE_START_2)):
        with Locations((-67.35983871, 1)):
            Rectangle(SKETCH_29_W, SKETCH_29_H)
    extrude(amount=EXTRUDE_21_DEPTH)

    # Эскиз30 → Вырез-Вытянуть14 (cut, through all)
    with BuildSketch(Plane.XZ.offset(-24.322580645)):
        with Locations((-71.35483871, 1.206267463)):
            Rectangle(SKETCH_30_W, SKETCH_30_H)
        with Locations((-63.35483871, 1.206267463)):
            Rectangle(SKETCH_30_W, SKETCH_30_H)
    extrude(amount=-CUT_EXTRUDE_14_DEPTH, mode=Mode.SUBTRACT)

    # Скругление7
    fillet_7_edges = [part.edges().sort_by_distance(p)[0] for p in [
        (-76.35483871, 38.322580645, 1),
        (-58.35483871, 38.322580645, 1),
        (-58.35483871, 24.322580645, 1),
        (-76.35483871, 24.322580645, 1),
    ]]
    fillet(fillet_7_edges, radius=FILLET_7_R)


solid = part.part
